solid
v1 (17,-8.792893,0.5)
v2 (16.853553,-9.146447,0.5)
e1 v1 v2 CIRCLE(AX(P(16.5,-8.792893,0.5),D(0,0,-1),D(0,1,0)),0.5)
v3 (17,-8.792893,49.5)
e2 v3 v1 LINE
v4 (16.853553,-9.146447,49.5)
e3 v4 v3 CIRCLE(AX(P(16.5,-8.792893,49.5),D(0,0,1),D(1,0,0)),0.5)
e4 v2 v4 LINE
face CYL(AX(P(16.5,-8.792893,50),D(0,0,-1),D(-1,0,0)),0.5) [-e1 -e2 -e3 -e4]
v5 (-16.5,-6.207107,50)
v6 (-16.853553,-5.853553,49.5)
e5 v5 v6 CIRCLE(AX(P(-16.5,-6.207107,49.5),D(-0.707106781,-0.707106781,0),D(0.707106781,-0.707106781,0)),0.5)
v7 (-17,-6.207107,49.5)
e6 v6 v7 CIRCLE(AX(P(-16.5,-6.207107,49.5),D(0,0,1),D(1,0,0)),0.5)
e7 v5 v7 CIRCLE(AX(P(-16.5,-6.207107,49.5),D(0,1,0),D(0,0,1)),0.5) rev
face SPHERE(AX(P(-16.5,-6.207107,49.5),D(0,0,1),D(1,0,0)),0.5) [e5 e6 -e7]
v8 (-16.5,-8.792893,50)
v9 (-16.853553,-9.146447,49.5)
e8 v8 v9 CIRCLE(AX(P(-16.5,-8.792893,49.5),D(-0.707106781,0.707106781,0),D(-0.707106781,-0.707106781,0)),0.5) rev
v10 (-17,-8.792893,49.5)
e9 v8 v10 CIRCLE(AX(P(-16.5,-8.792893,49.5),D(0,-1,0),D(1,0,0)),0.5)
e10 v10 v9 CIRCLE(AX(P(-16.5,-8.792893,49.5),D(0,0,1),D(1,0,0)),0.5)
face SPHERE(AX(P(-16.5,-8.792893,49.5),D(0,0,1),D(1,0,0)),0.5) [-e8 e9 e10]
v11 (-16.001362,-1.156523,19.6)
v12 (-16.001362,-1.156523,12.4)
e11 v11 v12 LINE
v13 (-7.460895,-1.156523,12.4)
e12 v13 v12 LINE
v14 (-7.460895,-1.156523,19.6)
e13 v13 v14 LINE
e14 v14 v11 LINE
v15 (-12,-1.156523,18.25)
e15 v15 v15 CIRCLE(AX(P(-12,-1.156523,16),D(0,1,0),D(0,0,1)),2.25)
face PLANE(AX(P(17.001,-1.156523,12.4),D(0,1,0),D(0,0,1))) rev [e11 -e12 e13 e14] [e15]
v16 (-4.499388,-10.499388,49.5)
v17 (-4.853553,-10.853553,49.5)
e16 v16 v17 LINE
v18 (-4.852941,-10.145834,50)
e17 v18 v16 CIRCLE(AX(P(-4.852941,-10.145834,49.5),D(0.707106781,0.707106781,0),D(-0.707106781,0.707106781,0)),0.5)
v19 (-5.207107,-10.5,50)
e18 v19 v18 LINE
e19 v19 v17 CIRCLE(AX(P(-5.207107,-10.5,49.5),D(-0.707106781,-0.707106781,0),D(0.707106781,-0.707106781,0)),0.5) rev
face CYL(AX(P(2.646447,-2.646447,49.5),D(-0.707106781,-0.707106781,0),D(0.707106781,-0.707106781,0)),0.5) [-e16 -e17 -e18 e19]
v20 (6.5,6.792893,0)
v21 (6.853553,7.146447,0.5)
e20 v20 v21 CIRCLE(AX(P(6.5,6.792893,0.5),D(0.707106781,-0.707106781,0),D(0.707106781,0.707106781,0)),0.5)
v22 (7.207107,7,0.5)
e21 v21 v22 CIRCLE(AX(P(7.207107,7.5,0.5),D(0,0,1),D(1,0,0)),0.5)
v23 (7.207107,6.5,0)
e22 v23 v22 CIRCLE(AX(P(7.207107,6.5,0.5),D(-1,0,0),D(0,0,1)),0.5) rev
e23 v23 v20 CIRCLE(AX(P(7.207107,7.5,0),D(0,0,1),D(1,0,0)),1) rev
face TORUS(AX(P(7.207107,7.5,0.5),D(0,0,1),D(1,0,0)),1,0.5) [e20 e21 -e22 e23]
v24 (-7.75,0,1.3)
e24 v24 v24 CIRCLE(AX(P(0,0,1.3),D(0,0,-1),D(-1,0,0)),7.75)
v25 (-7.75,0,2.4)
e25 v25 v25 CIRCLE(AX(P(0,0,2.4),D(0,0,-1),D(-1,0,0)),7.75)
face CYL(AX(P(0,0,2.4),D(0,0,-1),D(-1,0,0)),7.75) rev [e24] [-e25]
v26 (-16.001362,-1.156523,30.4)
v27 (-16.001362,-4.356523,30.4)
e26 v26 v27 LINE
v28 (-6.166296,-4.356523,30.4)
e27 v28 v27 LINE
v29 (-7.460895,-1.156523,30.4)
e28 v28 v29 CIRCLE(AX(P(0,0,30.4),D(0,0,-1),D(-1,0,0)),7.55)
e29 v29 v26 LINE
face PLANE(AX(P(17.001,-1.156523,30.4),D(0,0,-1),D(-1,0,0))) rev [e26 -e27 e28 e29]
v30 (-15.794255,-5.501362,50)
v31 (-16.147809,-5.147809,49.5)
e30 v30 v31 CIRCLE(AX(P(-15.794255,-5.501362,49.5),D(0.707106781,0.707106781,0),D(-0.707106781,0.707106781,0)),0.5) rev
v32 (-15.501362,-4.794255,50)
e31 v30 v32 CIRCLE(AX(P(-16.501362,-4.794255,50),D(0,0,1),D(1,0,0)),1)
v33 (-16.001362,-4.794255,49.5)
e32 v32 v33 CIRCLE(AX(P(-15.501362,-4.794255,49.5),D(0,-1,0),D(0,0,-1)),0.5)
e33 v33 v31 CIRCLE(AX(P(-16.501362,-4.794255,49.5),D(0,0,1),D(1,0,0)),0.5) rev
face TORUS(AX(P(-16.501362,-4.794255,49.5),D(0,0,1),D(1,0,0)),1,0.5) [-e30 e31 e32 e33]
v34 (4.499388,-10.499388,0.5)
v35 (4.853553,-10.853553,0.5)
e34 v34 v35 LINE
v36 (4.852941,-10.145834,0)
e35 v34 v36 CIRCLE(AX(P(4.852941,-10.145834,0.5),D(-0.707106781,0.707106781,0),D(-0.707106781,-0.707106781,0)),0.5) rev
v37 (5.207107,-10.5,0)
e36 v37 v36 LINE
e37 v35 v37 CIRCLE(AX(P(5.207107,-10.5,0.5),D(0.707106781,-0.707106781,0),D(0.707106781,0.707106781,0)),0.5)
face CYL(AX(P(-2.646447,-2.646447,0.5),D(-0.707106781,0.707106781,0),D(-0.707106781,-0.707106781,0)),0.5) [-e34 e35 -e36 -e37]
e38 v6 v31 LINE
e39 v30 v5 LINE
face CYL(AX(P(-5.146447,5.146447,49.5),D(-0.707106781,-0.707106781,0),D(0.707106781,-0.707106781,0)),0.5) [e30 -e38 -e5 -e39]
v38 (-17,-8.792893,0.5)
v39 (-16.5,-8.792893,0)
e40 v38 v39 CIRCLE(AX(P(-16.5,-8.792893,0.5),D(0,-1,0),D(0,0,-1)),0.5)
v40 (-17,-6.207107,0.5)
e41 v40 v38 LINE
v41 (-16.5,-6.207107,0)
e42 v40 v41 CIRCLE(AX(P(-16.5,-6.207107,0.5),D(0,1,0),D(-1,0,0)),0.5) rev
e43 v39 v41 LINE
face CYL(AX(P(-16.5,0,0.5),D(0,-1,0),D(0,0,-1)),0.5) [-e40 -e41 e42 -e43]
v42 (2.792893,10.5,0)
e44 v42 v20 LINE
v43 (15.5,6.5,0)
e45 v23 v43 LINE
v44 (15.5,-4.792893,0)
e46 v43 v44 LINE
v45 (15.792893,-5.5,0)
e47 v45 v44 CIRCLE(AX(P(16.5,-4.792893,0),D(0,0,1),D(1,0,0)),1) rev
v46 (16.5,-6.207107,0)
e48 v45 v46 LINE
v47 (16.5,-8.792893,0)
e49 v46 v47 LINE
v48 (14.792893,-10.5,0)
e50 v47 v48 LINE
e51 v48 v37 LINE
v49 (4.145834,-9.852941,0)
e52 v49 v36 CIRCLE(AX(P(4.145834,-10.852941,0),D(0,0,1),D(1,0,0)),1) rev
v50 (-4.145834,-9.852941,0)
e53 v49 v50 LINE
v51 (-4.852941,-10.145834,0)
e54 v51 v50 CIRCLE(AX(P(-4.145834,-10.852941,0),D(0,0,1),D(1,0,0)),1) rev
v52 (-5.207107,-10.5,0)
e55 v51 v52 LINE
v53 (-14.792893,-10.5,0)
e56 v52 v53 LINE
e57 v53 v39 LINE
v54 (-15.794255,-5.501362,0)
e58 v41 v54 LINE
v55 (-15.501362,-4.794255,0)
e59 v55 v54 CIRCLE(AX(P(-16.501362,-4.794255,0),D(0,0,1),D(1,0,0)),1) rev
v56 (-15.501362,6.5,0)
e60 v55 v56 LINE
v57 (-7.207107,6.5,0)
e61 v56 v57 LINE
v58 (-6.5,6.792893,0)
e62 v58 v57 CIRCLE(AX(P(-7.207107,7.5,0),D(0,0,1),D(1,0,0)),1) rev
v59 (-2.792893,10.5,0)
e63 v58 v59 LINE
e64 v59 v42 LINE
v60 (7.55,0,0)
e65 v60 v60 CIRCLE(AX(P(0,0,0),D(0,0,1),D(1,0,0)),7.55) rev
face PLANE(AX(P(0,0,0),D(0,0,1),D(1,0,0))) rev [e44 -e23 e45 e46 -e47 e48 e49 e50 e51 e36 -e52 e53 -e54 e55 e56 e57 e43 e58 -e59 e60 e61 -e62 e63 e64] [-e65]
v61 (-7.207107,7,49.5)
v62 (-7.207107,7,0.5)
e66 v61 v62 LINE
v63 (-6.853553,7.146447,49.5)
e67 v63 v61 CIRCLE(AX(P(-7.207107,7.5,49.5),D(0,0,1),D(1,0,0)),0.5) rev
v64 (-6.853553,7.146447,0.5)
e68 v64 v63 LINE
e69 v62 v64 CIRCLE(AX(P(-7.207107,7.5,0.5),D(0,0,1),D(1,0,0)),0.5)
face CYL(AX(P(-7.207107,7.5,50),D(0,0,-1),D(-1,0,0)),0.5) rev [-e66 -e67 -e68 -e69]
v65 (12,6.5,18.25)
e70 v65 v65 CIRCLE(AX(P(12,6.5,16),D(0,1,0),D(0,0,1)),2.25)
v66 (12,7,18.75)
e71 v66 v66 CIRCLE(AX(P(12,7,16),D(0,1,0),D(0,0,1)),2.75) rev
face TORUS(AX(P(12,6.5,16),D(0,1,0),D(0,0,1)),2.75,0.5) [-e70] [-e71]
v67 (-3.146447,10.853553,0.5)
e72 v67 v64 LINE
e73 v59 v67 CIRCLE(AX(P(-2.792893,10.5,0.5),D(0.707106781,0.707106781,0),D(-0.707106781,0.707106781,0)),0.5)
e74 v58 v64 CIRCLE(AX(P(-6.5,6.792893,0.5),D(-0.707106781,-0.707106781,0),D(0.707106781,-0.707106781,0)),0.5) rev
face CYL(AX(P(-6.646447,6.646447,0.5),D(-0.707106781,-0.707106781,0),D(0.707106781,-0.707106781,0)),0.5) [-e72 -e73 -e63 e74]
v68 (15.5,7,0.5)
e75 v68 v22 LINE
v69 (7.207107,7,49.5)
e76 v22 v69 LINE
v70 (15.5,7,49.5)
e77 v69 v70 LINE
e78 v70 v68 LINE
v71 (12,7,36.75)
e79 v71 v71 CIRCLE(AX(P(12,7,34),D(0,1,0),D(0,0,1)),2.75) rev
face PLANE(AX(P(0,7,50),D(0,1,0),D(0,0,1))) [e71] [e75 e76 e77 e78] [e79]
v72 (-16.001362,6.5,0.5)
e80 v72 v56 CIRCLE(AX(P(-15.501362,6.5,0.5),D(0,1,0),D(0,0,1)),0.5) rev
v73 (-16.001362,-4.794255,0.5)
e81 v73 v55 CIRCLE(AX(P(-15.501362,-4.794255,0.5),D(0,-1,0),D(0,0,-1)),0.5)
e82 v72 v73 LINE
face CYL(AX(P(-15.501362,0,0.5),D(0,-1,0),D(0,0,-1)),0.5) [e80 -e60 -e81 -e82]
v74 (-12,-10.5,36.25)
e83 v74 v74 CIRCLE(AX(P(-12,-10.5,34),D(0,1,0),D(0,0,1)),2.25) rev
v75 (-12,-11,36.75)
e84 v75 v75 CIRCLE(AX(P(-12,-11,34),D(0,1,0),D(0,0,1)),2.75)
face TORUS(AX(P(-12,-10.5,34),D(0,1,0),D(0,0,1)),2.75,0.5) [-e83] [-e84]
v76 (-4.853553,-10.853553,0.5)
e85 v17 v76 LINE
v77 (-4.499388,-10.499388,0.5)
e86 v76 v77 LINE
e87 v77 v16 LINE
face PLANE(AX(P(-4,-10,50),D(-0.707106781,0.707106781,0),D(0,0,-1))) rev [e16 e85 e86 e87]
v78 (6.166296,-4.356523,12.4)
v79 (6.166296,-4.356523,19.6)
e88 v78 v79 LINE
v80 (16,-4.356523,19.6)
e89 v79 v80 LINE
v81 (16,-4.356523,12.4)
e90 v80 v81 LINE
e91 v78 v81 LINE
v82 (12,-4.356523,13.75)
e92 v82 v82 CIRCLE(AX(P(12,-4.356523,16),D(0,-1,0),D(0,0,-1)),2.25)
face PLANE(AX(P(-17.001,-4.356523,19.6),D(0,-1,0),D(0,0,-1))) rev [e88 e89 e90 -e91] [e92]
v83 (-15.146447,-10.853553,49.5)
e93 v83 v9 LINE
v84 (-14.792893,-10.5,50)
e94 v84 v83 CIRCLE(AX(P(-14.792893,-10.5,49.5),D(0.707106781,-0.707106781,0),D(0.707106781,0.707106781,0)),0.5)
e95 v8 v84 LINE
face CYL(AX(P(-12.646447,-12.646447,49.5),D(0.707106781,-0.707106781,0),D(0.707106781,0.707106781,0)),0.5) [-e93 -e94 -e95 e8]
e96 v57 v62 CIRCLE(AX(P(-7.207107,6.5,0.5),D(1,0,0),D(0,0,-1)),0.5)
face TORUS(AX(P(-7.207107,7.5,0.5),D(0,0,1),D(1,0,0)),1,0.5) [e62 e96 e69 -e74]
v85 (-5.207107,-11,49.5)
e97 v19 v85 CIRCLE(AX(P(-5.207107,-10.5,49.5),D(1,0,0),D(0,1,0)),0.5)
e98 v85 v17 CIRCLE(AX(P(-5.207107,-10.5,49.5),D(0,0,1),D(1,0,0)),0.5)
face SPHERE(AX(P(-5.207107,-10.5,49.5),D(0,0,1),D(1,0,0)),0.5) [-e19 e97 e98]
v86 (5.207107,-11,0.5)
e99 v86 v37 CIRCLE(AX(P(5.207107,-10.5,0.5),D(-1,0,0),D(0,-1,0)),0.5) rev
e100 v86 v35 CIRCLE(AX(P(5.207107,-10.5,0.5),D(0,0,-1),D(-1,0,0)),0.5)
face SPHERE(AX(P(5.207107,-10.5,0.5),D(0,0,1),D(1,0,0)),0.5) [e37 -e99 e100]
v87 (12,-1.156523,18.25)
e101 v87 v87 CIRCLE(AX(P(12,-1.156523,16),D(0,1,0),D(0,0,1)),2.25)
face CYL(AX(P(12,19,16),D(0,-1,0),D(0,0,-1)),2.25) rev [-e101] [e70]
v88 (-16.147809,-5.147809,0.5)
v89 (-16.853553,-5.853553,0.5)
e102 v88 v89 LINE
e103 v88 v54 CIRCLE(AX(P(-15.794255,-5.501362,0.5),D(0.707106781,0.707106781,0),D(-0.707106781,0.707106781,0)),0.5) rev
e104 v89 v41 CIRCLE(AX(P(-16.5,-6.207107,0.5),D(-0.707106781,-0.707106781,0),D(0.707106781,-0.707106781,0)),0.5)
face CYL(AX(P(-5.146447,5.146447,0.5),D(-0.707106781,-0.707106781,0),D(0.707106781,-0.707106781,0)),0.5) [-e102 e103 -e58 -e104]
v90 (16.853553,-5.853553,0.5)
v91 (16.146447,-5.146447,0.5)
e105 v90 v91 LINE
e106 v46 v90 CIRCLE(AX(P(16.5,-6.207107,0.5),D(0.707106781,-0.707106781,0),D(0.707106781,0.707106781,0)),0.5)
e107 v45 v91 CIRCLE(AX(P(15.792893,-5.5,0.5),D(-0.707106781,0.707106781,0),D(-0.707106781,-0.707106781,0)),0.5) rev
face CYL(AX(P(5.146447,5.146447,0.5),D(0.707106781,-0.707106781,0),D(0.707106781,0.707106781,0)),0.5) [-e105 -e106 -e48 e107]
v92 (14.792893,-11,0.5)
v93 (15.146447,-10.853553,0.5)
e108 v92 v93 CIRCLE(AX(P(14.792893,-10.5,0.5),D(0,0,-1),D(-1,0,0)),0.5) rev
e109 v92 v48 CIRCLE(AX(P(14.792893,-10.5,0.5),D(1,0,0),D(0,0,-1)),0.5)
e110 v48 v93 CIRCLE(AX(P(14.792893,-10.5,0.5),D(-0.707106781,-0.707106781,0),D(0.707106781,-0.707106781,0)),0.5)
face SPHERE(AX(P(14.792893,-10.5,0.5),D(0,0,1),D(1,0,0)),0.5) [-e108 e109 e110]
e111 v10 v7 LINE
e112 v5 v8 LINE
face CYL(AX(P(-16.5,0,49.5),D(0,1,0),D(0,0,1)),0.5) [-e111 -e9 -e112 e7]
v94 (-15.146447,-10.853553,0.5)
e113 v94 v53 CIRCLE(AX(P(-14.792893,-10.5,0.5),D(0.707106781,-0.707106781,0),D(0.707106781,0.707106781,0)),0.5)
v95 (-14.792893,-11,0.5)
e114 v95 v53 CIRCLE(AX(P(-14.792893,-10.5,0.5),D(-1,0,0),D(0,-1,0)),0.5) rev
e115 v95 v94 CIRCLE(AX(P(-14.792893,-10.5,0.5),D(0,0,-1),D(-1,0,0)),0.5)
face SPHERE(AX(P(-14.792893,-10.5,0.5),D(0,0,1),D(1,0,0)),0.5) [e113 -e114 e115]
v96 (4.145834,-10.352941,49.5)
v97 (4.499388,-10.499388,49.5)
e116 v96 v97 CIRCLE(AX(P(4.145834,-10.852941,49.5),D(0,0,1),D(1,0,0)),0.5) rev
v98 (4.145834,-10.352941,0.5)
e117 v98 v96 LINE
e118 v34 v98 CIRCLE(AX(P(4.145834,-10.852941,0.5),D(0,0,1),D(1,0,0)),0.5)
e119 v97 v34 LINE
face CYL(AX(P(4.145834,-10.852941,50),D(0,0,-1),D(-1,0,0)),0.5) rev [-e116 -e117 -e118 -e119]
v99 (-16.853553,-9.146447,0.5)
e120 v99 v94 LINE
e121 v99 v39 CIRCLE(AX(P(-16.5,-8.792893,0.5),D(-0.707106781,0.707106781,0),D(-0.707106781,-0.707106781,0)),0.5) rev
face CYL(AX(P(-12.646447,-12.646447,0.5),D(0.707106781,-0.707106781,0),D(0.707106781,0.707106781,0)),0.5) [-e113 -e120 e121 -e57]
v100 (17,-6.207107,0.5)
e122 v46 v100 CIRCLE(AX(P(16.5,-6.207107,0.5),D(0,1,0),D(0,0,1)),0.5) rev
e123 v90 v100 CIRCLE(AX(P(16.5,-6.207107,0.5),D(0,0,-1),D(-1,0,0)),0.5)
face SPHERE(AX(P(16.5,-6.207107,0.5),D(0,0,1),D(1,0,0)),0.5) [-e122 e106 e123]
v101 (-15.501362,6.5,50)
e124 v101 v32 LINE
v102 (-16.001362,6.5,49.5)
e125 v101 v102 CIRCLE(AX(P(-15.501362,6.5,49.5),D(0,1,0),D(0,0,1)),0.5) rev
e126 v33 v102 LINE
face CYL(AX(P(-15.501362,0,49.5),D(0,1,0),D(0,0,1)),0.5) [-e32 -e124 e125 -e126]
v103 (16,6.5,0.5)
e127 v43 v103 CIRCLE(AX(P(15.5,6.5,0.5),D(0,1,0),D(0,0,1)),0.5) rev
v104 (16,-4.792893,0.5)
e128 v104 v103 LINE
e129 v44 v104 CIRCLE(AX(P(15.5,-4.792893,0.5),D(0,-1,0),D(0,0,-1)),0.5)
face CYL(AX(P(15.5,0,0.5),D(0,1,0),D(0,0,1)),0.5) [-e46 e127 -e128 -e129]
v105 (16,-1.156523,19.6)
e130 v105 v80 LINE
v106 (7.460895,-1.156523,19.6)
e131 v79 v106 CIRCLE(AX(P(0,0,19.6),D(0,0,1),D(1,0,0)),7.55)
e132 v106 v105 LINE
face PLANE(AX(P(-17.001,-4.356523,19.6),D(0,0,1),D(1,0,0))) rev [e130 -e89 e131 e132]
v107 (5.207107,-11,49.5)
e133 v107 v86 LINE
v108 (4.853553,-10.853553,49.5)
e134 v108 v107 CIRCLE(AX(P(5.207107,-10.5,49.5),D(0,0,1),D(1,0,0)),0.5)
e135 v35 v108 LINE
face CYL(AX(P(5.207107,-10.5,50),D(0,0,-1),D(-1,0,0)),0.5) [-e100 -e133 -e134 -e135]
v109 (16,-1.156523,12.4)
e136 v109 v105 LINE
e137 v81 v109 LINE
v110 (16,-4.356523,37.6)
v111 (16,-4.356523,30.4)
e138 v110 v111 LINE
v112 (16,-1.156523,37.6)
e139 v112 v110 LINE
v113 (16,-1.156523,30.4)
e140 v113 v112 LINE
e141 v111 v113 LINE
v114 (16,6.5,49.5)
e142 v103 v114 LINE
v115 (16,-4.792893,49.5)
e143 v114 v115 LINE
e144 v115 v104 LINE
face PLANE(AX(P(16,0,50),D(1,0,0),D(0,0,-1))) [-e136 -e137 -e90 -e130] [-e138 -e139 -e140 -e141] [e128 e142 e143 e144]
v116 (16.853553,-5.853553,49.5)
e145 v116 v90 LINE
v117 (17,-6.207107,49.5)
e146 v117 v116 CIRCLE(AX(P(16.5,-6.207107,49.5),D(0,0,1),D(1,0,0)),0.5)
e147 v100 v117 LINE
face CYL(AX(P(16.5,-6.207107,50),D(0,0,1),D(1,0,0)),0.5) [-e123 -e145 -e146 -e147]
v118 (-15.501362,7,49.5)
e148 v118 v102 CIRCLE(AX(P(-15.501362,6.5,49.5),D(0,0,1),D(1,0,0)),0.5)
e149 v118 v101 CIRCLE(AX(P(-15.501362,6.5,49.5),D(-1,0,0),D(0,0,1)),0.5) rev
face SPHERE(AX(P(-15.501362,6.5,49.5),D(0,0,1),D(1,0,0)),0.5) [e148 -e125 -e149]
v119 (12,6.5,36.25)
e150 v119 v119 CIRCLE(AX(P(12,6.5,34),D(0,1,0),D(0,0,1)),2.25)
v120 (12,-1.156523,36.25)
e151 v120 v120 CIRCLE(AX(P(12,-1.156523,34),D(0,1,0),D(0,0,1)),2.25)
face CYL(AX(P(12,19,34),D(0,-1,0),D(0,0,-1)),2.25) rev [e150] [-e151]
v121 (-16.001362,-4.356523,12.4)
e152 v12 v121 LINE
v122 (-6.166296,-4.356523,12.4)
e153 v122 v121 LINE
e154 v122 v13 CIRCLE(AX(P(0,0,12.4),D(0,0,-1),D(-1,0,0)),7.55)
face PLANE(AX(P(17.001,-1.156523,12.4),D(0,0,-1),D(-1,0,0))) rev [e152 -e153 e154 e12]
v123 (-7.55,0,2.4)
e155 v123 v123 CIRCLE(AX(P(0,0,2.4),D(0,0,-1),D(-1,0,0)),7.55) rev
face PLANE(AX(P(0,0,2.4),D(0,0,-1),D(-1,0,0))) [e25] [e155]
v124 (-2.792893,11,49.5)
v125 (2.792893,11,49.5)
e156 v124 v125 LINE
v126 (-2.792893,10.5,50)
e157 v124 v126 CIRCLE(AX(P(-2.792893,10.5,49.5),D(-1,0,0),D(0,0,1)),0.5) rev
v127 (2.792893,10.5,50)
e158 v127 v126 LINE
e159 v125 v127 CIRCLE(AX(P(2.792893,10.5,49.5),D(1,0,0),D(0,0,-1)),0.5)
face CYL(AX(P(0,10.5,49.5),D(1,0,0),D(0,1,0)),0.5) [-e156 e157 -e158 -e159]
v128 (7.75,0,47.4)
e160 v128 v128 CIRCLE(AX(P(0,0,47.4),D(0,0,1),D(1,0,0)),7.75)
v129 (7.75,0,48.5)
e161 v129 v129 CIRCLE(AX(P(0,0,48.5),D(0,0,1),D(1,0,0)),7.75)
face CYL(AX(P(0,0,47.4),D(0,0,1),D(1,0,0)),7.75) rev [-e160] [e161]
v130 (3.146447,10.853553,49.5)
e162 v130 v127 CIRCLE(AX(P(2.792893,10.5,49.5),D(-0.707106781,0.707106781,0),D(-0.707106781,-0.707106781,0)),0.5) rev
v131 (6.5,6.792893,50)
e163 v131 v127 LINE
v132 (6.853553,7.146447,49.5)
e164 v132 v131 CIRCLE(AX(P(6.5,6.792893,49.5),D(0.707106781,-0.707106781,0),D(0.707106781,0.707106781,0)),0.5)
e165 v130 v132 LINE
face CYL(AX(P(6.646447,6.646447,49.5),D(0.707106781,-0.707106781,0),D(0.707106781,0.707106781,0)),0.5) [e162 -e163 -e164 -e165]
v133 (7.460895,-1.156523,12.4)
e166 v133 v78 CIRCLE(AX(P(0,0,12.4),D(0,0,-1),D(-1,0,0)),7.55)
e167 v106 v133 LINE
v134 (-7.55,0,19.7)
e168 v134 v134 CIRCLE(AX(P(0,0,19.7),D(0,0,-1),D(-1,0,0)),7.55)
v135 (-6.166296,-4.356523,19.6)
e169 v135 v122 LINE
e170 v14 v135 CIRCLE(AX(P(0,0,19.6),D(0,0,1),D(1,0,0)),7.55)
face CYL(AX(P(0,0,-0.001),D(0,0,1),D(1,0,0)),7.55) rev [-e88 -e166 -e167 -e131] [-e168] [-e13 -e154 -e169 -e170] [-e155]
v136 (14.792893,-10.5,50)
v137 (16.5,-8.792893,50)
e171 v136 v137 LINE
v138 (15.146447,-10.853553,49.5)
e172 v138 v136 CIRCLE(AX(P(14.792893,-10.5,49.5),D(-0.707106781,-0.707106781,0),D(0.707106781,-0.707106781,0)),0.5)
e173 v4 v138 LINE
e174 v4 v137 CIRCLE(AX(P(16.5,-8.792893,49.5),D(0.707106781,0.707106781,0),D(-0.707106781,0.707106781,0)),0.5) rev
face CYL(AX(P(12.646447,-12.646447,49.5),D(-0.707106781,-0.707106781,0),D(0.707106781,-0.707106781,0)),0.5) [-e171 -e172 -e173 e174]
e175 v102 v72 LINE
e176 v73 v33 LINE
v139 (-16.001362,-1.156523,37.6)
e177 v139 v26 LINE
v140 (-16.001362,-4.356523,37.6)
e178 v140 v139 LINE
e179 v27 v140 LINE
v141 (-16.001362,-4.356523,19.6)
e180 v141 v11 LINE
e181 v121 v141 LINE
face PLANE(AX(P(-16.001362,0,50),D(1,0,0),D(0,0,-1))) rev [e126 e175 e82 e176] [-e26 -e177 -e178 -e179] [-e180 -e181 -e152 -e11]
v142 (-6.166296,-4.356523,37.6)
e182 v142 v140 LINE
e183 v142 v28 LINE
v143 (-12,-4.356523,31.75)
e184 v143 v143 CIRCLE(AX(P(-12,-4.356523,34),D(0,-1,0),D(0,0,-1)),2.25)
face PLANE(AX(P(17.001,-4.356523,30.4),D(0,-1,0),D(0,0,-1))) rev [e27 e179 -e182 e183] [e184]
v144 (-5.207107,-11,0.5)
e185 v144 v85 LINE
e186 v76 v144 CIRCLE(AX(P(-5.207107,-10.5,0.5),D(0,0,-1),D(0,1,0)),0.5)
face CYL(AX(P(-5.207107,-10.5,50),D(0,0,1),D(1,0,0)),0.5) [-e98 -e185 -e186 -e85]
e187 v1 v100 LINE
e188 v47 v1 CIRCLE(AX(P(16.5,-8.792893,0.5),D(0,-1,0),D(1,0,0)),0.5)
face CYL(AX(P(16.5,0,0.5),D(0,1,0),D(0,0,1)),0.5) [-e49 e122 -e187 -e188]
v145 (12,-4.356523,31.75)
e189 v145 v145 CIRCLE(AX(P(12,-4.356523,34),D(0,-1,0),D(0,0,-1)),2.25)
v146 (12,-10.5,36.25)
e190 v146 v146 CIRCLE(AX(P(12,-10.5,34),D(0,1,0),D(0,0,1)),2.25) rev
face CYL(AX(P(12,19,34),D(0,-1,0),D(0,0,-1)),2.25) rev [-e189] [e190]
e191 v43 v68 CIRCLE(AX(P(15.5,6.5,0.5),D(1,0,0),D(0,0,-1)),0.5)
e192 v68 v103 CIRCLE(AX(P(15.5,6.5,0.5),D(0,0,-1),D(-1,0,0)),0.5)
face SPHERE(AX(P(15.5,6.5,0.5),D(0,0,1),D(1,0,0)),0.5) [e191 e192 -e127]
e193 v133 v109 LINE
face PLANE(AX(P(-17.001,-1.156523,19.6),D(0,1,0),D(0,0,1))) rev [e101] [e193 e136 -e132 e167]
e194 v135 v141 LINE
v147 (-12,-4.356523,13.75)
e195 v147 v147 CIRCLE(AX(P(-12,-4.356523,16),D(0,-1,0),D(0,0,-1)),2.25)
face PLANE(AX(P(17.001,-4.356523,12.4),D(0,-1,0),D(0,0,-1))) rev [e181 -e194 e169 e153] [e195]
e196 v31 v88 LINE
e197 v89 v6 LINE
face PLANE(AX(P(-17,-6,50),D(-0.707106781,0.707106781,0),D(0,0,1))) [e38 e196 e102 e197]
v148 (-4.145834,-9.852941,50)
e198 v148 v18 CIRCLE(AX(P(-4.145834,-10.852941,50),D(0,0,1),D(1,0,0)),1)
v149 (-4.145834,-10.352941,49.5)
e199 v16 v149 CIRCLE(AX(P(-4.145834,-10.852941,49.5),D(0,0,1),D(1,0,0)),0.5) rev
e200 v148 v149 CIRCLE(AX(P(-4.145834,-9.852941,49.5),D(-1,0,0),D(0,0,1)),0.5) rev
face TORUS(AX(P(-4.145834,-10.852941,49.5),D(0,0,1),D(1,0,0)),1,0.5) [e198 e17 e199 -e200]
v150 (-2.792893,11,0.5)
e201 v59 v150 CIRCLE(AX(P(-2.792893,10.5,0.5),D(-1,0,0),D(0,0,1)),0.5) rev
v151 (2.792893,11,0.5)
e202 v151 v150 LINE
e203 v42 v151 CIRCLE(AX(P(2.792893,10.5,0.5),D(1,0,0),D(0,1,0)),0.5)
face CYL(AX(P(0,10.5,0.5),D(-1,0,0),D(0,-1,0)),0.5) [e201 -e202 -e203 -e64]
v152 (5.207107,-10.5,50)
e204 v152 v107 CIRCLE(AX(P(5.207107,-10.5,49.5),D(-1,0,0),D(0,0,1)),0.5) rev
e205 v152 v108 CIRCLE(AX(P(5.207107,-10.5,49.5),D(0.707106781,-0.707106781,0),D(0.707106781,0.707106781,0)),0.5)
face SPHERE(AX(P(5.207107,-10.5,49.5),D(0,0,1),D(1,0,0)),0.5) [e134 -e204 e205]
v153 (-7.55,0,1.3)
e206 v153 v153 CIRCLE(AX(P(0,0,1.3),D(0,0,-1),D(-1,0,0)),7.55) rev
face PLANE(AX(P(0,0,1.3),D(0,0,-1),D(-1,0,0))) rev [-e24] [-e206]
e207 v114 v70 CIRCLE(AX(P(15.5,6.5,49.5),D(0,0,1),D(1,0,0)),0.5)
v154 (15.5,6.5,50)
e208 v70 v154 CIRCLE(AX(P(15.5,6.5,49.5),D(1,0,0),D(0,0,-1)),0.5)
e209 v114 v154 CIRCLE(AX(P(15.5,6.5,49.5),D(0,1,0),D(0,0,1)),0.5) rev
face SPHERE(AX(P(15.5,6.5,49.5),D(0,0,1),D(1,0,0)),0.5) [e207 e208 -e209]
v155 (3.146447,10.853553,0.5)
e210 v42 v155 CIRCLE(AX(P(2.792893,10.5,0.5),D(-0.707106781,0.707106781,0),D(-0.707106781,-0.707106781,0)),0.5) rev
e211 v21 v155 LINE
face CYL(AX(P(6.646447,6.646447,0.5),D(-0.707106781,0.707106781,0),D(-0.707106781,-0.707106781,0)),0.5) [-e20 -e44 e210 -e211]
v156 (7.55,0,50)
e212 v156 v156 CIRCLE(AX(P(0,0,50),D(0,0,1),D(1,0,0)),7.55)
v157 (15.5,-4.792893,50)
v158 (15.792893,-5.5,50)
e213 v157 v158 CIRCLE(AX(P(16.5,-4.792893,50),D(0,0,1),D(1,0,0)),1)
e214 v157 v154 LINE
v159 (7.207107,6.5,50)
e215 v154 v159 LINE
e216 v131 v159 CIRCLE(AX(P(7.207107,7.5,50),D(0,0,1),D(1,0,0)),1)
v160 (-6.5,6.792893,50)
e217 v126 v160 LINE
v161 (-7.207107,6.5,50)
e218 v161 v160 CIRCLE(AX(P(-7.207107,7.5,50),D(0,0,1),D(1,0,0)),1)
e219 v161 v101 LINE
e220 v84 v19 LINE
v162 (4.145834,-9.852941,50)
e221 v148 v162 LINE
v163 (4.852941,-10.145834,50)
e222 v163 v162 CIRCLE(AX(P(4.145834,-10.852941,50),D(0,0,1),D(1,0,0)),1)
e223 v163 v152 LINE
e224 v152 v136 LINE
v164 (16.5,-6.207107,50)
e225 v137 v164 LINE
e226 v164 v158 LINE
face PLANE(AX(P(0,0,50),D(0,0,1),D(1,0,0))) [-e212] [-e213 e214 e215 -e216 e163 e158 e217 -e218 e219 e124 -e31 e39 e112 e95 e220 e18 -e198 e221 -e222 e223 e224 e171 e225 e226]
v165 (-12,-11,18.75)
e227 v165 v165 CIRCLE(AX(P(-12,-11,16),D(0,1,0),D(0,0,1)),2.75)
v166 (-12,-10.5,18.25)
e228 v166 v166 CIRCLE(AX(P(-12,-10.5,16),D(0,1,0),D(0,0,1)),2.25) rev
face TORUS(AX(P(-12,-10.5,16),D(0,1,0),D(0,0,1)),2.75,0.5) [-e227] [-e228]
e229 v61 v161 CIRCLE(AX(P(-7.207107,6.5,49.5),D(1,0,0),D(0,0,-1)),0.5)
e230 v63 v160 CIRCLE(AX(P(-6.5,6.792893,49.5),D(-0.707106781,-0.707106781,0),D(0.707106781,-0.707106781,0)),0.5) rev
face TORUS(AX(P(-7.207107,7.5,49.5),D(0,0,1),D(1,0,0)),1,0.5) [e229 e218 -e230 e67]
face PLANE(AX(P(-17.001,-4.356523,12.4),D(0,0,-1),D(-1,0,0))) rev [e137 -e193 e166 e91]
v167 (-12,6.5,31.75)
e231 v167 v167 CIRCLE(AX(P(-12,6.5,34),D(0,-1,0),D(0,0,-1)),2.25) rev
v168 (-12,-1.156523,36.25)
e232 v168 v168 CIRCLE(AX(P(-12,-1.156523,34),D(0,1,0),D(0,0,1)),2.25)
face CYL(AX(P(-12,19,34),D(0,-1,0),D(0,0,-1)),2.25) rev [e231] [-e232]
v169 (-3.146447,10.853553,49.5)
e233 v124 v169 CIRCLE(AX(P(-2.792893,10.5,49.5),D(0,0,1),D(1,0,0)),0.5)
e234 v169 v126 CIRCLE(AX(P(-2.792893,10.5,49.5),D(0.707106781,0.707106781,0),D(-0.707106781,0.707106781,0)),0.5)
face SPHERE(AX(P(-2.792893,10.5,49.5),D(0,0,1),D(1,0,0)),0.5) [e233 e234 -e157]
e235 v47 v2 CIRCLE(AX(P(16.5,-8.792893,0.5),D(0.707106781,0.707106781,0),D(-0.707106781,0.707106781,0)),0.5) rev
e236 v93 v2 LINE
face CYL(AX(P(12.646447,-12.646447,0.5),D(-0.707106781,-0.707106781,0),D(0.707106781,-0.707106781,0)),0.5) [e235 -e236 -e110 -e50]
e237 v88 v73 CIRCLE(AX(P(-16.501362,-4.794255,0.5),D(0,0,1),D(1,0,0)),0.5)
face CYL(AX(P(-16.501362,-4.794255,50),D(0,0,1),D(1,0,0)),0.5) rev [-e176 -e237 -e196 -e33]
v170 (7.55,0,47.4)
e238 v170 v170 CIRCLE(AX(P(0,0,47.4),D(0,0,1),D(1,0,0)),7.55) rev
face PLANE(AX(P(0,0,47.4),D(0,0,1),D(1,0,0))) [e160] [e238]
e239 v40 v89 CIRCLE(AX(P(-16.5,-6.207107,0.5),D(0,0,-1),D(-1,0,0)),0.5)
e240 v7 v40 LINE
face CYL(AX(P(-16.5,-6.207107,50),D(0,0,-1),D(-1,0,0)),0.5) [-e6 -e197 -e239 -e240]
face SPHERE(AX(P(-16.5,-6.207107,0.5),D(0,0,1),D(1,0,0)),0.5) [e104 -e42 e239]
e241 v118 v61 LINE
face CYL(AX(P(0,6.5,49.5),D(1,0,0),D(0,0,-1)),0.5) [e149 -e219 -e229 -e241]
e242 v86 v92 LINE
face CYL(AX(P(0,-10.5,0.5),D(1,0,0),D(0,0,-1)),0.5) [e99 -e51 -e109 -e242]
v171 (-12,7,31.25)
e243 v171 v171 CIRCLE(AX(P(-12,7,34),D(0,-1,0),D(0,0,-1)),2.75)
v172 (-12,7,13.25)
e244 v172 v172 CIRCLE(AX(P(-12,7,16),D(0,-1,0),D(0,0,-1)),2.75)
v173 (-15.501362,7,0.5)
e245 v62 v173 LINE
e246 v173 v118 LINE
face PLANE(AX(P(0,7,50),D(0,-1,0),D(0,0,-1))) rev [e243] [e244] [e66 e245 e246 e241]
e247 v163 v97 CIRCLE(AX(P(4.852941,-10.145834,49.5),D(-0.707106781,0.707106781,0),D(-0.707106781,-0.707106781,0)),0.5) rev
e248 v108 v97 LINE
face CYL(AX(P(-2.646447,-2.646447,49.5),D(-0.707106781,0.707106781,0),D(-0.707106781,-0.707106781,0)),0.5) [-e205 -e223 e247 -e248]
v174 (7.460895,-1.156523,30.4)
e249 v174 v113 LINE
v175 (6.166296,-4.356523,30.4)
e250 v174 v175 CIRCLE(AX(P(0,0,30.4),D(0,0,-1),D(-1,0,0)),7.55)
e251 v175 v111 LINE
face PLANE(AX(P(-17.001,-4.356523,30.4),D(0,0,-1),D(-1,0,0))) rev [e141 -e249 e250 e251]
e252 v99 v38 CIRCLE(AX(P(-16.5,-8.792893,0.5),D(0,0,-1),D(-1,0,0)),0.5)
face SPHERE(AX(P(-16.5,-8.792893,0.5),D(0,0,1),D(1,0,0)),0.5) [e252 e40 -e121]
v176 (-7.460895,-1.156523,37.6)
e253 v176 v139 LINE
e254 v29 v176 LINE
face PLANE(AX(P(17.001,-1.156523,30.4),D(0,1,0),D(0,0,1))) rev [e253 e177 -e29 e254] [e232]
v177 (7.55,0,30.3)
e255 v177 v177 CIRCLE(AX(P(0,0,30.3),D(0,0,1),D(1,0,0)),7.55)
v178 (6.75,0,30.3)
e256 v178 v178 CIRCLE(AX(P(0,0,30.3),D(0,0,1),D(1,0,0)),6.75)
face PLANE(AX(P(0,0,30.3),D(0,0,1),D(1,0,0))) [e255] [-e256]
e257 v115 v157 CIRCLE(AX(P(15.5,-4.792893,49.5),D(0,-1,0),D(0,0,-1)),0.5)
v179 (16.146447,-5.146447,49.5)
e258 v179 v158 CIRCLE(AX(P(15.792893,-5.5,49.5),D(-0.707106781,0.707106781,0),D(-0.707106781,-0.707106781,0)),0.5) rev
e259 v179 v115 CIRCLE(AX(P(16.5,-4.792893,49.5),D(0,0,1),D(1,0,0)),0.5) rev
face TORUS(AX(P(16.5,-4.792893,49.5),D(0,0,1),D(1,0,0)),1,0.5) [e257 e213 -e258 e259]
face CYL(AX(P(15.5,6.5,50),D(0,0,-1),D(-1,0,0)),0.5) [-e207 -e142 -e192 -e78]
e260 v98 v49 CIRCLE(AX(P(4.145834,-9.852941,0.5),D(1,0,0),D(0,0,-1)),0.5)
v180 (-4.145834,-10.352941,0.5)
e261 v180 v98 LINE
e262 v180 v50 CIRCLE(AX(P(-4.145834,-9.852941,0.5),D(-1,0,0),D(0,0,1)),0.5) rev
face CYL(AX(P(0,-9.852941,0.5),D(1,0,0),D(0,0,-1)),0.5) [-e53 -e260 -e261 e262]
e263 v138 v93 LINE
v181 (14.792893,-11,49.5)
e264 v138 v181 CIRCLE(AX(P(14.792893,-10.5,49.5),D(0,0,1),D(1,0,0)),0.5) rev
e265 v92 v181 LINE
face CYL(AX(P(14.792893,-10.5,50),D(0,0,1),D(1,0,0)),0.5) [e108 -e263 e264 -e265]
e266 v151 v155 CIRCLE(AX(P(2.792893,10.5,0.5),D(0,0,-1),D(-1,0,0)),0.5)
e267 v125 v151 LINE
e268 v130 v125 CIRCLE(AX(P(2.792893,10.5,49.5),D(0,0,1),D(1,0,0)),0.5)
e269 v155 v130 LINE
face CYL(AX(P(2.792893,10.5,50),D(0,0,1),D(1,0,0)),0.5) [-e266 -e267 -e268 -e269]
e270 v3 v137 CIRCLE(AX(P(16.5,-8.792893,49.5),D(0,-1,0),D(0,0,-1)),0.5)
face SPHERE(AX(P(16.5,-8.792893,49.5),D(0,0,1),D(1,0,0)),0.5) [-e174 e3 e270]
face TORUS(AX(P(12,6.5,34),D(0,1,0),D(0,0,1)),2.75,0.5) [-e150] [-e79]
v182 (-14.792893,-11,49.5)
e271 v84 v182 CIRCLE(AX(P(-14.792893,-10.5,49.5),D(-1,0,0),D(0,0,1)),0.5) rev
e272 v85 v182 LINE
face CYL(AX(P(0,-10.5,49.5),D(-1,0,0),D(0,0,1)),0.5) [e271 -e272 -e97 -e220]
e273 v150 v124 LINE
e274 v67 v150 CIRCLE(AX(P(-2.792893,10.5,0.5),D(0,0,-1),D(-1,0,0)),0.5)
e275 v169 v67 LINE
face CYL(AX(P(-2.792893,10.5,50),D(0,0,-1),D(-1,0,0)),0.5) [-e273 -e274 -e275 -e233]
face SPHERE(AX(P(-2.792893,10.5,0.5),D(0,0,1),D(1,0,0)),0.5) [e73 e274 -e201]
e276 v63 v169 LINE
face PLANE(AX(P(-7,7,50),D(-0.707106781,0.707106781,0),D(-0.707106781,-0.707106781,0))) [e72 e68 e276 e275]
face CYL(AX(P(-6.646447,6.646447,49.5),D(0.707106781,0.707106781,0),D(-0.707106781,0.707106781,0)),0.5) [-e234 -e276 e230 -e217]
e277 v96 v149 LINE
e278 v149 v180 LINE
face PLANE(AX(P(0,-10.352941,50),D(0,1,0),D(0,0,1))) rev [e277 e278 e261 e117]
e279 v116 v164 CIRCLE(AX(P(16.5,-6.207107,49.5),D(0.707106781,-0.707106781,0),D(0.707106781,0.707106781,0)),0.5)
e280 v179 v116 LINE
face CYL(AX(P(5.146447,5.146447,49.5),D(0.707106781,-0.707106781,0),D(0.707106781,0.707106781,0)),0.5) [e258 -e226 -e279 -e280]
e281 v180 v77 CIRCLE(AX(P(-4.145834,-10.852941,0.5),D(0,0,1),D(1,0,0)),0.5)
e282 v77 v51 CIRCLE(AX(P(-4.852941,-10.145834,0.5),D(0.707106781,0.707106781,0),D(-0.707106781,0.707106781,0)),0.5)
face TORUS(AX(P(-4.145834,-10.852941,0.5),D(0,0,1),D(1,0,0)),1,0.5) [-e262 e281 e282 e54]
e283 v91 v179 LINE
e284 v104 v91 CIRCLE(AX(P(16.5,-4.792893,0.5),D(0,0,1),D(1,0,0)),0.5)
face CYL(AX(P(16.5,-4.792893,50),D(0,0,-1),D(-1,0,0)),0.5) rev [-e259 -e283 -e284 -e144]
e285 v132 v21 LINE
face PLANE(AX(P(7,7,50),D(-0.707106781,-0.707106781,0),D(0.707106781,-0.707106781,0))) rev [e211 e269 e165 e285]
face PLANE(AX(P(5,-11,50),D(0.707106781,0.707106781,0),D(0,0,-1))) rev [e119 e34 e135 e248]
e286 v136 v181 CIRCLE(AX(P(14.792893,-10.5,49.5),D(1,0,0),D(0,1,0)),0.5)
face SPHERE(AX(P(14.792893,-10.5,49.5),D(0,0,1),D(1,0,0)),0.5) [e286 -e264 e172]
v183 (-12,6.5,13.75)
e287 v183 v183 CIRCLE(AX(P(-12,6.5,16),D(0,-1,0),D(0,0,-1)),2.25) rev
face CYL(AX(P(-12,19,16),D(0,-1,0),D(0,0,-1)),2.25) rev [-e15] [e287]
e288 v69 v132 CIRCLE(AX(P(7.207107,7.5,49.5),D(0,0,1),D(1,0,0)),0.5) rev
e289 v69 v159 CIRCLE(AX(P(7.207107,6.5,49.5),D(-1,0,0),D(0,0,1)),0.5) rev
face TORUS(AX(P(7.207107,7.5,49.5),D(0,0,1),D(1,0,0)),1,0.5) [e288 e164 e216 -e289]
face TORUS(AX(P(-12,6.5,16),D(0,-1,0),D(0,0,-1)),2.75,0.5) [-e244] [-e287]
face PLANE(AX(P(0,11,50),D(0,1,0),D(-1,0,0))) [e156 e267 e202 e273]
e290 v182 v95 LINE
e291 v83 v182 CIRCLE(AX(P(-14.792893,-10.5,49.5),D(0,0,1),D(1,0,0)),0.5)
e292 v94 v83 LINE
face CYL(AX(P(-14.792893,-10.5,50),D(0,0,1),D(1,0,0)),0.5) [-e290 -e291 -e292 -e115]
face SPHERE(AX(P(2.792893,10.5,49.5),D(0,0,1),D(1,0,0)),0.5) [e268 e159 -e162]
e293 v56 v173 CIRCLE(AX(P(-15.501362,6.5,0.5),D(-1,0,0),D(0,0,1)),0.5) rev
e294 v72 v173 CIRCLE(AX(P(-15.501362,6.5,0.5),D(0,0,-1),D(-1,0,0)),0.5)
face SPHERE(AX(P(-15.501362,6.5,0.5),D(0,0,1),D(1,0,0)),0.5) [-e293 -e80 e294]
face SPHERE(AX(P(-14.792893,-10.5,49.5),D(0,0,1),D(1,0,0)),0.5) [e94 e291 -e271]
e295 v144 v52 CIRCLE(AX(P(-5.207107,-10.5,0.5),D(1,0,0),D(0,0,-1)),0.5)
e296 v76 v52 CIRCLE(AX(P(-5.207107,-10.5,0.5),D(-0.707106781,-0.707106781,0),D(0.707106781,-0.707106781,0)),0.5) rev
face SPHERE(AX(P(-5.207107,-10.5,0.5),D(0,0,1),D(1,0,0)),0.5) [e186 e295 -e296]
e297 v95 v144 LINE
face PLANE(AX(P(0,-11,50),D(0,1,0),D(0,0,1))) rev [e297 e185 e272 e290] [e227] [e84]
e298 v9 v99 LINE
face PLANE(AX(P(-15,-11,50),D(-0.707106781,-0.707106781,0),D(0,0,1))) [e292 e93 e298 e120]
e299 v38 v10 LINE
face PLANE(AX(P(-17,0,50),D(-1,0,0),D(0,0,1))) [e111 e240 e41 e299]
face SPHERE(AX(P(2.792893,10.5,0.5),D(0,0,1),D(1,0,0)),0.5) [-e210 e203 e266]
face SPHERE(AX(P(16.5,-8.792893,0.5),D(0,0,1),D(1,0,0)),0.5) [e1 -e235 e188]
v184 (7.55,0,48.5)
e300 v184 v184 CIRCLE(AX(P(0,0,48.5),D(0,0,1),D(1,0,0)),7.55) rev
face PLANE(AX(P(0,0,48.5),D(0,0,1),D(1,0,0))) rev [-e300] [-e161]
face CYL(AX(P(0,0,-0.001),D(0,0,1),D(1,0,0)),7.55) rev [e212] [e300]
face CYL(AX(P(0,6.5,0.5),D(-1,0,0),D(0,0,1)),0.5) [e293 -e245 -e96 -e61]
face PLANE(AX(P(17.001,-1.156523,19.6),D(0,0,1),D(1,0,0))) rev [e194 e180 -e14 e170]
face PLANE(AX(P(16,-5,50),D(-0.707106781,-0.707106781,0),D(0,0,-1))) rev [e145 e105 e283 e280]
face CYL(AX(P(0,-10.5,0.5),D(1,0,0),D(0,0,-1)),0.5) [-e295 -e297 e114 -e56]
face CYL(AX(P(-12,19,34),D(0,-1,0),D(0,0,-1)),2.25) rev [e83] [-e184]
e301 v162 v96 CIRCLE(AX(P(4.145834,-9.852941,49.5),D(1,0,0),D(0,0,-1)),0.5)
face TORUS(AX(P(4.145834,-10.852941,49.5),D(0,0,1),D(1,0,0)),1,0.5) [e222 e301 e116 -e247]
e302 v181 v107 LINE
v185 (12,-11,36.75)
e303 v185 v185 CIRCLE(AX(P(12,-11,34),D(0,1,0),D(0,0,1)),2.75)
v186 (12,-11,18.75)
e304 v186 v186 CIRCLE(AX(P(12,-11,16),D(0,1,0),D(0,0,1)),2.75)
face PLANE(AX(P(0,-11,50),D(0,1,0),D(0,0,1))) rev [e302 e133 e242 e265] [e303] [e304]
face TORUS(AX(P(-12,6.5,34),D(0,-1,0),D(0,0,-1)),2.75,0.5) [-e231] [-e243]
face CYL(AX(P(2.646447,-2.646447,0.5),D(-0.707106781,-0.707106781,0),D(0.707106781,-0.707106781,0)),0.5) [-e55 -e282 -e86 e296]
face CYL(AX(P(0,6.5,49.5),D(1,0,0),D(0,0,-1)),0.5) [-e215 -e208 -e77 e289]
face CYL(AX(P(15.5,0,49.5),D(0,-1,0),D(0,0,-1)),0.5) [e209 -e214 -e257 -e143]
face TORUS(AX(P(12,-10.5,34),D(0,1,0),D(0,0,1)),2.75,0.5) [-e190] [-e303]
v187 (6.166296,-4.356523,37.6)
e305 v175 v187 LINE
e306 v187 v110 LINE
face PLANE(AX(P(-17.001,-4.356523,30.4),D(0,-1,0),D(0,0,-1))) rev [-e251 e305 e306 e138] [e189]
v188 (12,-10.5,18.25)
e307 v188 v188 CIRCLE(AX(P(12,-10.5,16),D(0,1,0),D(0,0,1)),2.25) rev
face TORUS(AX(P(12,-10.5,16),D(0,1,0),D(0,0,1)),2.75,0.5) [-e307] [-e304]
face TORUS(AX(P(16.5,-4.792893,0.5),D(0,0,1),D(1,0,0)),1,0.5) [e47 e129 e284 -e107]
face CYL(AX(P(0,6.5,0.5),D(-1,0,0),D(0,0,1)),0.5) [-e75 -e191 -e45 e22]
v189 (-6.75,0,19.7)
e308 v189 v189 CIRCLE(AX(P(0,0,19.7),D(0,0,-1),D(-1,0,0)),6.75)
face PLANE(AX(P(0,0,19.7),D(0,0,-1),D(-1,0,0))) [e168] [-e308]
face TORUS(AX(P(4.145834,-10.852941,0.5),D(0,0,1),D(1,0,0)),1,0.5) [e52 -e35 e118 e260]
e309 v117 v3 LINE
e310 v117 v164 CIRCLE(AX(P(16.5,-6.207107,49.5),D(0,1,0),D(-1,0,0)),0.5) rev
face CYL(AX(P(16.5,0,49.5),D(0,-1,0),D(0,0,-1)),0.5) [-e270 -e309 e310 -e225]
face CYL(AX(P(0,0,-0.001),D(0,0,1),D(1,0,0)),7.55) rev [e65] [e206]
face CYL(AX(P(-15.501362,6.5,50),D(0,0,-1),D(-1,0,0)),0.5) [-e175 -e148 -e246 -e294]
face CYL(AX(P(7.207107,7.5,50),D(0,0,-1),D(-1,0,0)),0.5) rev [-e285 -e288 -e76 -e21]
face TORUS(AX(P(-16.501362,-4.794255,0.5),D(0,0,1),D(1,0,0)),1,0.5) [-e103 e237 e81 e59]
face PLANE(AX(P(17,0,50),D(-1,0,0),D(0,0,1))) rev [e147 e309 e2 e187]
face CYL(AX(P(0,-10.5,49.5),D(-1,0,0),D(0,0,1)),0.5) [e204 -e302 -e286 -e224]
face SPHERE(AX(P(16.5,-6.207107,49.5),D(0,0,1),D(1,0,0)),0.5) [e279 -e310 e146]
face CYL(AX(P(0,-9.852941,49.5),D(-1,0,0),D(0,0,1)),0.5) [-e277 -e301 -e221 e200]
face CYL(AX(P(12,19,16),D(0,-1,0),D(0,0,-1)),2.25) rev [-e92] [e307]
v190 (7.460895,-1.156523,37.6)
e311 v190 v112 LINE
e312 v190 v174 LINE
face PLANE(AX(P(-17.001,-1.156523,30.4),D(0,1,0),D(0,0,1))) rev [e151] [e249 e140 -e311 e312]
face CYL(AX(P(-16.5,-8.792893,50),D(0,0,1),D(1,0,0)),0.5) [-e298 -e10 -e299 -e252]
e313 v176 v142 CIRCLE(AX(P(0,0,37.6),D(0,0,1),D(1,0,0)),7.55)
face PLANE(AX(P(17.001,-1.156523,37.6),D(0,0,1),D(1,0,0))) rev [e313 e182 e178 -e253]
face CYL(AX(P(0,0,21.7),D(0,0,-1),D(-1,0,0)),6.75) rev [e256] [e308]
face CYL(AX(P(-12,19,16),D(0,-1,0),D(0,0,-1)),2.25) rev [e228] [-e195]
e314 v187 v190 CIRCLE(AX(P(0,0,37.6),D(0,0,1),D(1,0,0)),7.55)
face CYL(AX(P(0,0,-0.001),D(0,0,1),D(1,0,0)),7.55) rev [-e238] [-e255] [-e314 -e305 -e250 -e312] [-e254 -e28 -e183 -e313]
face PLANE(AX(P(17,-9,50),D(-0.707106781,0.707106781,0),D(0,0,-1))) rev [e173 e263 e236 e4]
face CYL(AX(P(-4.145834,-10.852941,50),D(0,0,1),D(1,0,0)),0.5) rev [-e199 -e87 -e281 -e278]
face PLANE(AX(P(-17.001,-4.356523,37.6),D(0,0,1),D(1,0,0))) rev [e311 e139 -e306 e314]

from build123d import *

# Parameters (mm, degrees)
SKETCH1_R               = 4
BOSS_EXTRUDE1_DEPTH     = 50
CHAMFER1_SIZE           = 2
CHAMFER2_SIZE           = 1
FILLET1_R               = 0.5
SKETCH2_R               = 7
SKETCH2_R_2             = 3
CUT_EXTRUDE1_DEPTH      = 0.5
SKETCH4_R               = 2.25
CUT_EXTRUDE3_DEPTH      = 30
FILLET5_R               = 0.5
CUT_EXTRUDE4_REACH      = 55.944
SKETCH3_R               = 7.55
CUT_EXTRUDE5_START      = -1.3
SKETCH5_R               = 7.75
CUT_EXTRUDE5_DEPTH      = 1.1
CUT_EXTRUDE6_START      = -2.6
SKETCH6_R               = 7.75
CUT_EXTRUDE6_DEPTH      = 1.1
CUT_EXTRUDE7_REACH      = 62.91
CUT_EXTRUDE7_END_RADIUS = 7.55
SKETCH7_W               = 7.2
SKETCH7_H               = 3.2
CUT_EXTRUDE8_REACH      = 62.911
CUT_EXTRUDE8_END_RADIUS = 7.55
SKETCH8_W               = 7.2
SKETCH8_H               = 3.2
BOSS_EXTRUDE2_START     = -21.7
SKETCH9_R               = 7.55
SKETCH9_R_2             = 6.75
BOSS_EXTRUDE2_DEPTH     = 2
BOSS_EXTRUDE3_START     = -19.7
SKETCH10_R              = 7.55
SKETCH10_R_2            = 6.75
BOSS_EXTRUDE3_DEPTH     = 8.6


with BuildPart() as part:
    # Sketch1 → Boss-Extrude1 (new body)
    with BuildSketch(Plane.XY):
        Polygon((-17, -11), (-4, -11), (-4, -10.352941176), (4, -10.352941176), (4, -11), (17, -11), (17, -5), (16, -5), (16, 7), (7, 7), (3, 11), (-3, 11), (-7, 7), (-16.001361991, 7), (-16.001361991, -5), (-17, -5), align=None)
        Circle(SKETCH1_R, mode=Mode.SUBTRACT)
    extrude(amount=BOSS_EXTRUDE1_DEPTH)

    # Chamfer1
    chamfer1_edges = [part.edges().sort_by_distance(p)[0] for p in [
        (-17, -11, 25),
        (17, -11, 25),
    ]]
    chamfer(chamfer1_edges, length=CHAMFER1_SIZE)

    # Chamfer2
    # the kernel refuses this chamfer: 1 mm, written as the material it takes off along each edge
    with BuildSketch(Plane(origin=(17, -5, -2.571682988), x_dir=(0.027495876610585623, -0.9996219169112968, 0), z_dir=(0, 0, 1))) as chamfer2_piece_1_section:
        Polygon((CHAMFER2_SIZE * 0.999621916911, -CHAMFER2_SIZE * 0.0274958766106), (-CHAMFER2_SIZE * 0.0274958766106, -CHAMFER2_SIZE * 0.999621916911), (0, 0), align=None)
    chamfer2_piece_1 = extrude(amount=55.143365976, mode=Mode.PRIVATE)
    chamfer2_piece_1 = split(chamfer2_piece_1, bisect_by=Plane(origin=(16, -5.330404154, 25), z_dir=(1, 0, 0)), keep=Keep.TOP, mode=Mode.PRIVATE)
    add(chamfer2_piece_1, mode=Mode.SUBTRACT)
    with BuildSketch(Plane(origin=(-17, -5, -2.571682988), x_dir=(-0.027495876610585623, -0.9996219169112968, 0), z_dir=(0, 0, 1))) as chamfer2_piece_2_section:
        Polygon((CHAMFER2_SIZE * 0.999621916911, CHAMFER2_SIZE * 0.0274958766106), (-CHAMFER2_SIZE * 0.0274958766106, CHAMFER2_SIZE * 0.999621916911), (0, 0), align=None)
    chamfer2_piece_2 = extrude(amount=55.143365976, mode=Mode.PRIVATE)
    chamfer2_piece_2 = split(chamfer2_piece_2, bisect_by=Plane(origin=(-16.001361991, -5.330444965, 25), z_dir=(-1, 0, 0)), keep=Keep.TOP, mode=Mode.PRIVATE)
    add(chamfer2_piece_2, mode=Mode.SUBTRACT)
    with BuildSketch(Plane(origin=(-4, -11, -2.571682988), x_dir=(-0.9996219169112968, -0.027495876610585623, 0), z_dir=(0, 0, 1))) as chamfer2_piece_3_section:
        Polygon((CHAMFER2_SIZE * 0.999621916911, -CHAMFER2_SIZE * 0.0274958766106), (-CHAMFER2_SIZE * 0.0274958766106, -CHAMFER2_SIZE * 0.999621916911), (0, 0), align=None)
    chamfer2_piece_3 = extrude(amount=55.143365976, mode=Mode.PRIVATE)
    chamfer2_piece_3 = split(chamfer2_piece_3, bisect_by=Plane(origin=(-4.367144938, -10.352941176, 25), z_dir=(0, -1, 0)), keep=Keep.TOP, mode=Mode.PRIVATE)
    add(chamfer2_piece_3, mode=Mode.SUBTRACT)
    with BuildSketch(Plane(origin=(4, -11, -2.571682988), x_dir=(-0.02749587661058651, 0.9996219169112968, 0), z_dir=(0, 0, 1))) as chamfer2_piece_4_section:
        Polygon((CHAMFER2_SIZE * 0.999621916911, -CHAMFER2_SIZE * 0.0274958766106), (-CHAMFER2_SIZE * 0.0274958766106, -CHAMFER2_SIZE * 0.999621916911), (0, 0), align=None)
    chamfer2_piece_4 = extrude(amount=55.143365976, mode=Mode.PRIVATE)
    chamfer2_piece_4 = split(chamfer2_piece_4, bisect_by=Plane(origin=(4.367144938, -10.352941176, 25), z_dir=(0, -1, 0)), keep=Keep.TOP, mode=Mode.PRIVATE)
    add(chamfer2_piece_4, mode=Mode.SUBTRACT)

    # Fillet1
    fillet1_edges = [part.edges().sort_by_distance(p)[0] for p in [
        (-4, 0, 0),
        (16, 1, 50),
        (0, -10.352941176, 0),
        (-16.001361991, 0.999319005, 0),
        (-11.500680995, 7, 0),
        (11.5, 7, 50),
        (-5, 9, 0),
        (0, 11, 0),
        (5, 9, 0),
        (11.5, 7, 0),
        (16, 1, 0),
        (5, 9, 50),
        (0, 11, 50),
        (-16.001361991, 7, 25),
        (-7, 7, 25),
        (-3, 11, 25),
        (3, 11, 25),
        (7, 7, 25),
        (16, 7, 25),
        (16, -5, 25),
        (-5, 9, 50),
        (-11.500680995, 7, 50),
        (-16.001361991, 0.999319005, 50),
        (-10, -11, 0),
        (-10, -11, 50),
        (-15, -11, 25),
        (-17, -7.5, 0),
        (17, -7.5, 0),
        (16, -10, 0),
        (-16, -10, 0),
        (-17, -7.5, 50),
        (-17, -9, 25),
        (17, -7.5, 50),
        (16, -10, 50),
        (-16, -10, 50),
        (17, -9, 25),
        (15, -11, 25),
        (0, -10.352941176, 50),
        (10, -11, 0),
        (4.676470588, -10.676470588, 0),
        (-4.676470588, -10.676470588, 0),
        (-16.500680995, -5.500680995, 0),
        (16.5, -5.5, 0),
        (17, -6, 25),
        (10, -11, 50),
        (4.676470588, -10.676470588, 50),
        (-4.676470588, -10.676470588, 50),
        (-16.500680995, -5.500680995, 50),
        (-4, 0, 50),
        (16.5, -5.5, 50),
        (-17, -6, 25),
        (-5, -11, 25),
        (5, -11, 25),
        (-16.001361991, -5.001361991, 25),
        (-4.352941176, -10.352941176, 25),
        (4.352941176, -10.352941176, 25),
    ]]
    fillet(fillet1_edges, radius=FILLET1_R)

    # Sketch2 → Cut-Extrude1 (cut)
    with BuildSketch(Plane(origin=(0, 0, 0), x_dir=(-1, 0, 0), z_dir=(0, 0, -1))):
        Circle(SKETCH2_R)
        Circle(SKETCH2_R_2, mode=Mode.SUBTRACT)
    extrude(amount=-CUT_EXTRUDE1_DEPTH, mode=Mode.SUBTRACT)

    # Sketch4 → Cut-Extrude3 (cut)
    with BuildSketch(Plane.XZ.offset(11)):
        with Locations(Location((-12, 16, 0), (0, 0, 270))):
            Circle(SKETCH4_R)
        with Locations(Location((12, 16, 0), (0, 0, 270))):
            Circle(SKETCH4_R)
        with Locations(Location((12, 34, 0), (0, 0, 270))):
            Circle(SKETCH4_R)
        with Locations(Location((-12, 34, 0), (0, 0, 270))):
            Circle(SKETCH4_R)
    extrude(amount=-CUT_EXTRUDE3_DEPTH, mode=Mode.SUBTRACT)

    # Fillet5
    fillet5_edges = [part.edges().sort_by_distance(p)[0] for p in [
        (-12, 7, 36.25),
        (-12, -11, 36.25),
        (12, 7, 36.25),
        (12, -11, 36.25),
        (12, 7, 18.25),
        (12, -11, 18.25),
        (-12, 7, 18.25),
        (-12, -11, 18.25),
    ]]
    fillet(fillet5_edges, radius=FILLET5_R)

    # Sketch3 → Cut-Extrude4 (cut, up to next)
    with BuildSketch(Plane.XY.offset(50), mode=Mode.PRIVATE) as cut_extrude4_sk1:
        Circle(SKETCH3_R)
    cut_extrude4_tool1 = extrude(cut_extrude4_sk1.sketch, amount=-CUT_EXTRUDE4_REACH, mode=Mode.PRIVATE) & part.part
    add(cut_extrude4_tool1.solids().sort_by_distance((0, 0, 50))[0], mode=Mode.SUBTRACT)

    # Sketch5 → Cut-Extrude5 (cut)
    with BuildSketch(Plane(origin=(0, 0, 0), x_dir=(-1, 0, 0), z_dir=(0, 0, -1)).offset(CUT_EXTRUDE5_START)):
        Circle(SKETCH5_R)
    extrude(amount=-CUT_EXTRUDE5_DEPTH, mode=Mode.SUBTRACT)

    # Sketch6 → Cut-Extrude6 (cut)
    with BuildSketch(Plane.XY.offset(50).offset(CUT_EXTRUDE6_START)):
        with Locations(Location((0, 0, 0), (0, 0, 180))):
            Circle(SKETCH6_R)
    extrude(amount=CUT_EXTRUDE6_DEPTH, mode=Mode.SUBTRACT)

    # Cut-Extrude7: up to this cylinder (the profile starts outside it)
    cut_extrude7_end = Plane(origin=(0, 0, 25), z_dir=(0, 0, 1)) * Cylinder(CUT_EXTRUDE7_END_RADIUS, 159.92, mode=Mode.PRIVATE)
    # Sketch7 → Cut-Extrude7 (cut, up to the surface)
    with BuildSketch(Plane(origin=(16, 0, 0), x_dir=(0, 0, -1), z_dir=(1, 0, 0)), mode=Mode.PRIVATE) as cut_extrude7_sk1:
        with Locations((-16, -2.756523471)):
            Rectangle(SKETCH7_W, SKETCH7_H)
    cut_extrude7_tool1 = extrude(cut_extrude7_sk1.sketch, amount=-CUT_EXTRUDE7_REACH, mode=Mode.PRIVATE) - cut_extrude7_end
    add(cut_extrude7_tool1.solids().sort_by_distance((16, -2.756523, 16))[0], mode=Mode.SUBTRACT)
    # Sketch7 → Cut-Extrude7 (cut, up to the surface)
    with BuildSketch(Plane(origin=(16, 0, 0), x_dir=(0, 0, -1), z_dir=(1, 0, 0)), mode=Mode.PRIVATE) as cut_extrude7_sk2:
        with Locations((-34, -2.756523471)):
            Rectangle(SKETCH7_W, SKETCH7_H)
    cut_extrude7_tool2 = extrude(cut_extrude7_sk2.sketch, amount=-CUT_EXTRUDE7_REACH, mode=Mode.PRIVATE) - cut_extrude7_end
    add(cut_extrude7_tool2.solids().sort_by_distance((16, -2.756523, 34))[0], mode=Mode.SUBTRACT)

    # Cut-Extrude8: up to this cylinder (the profile starts outside it)
    cut_extrude8_end = Plane(origin=(0, 0, 25), z_dir=(0, 0, 1)) * Cylinder(CUT_EXTRUDE8_END_RADIUS, 159.922, mode=Mode.PRIVATE)
    # Sketch8 → Cut-Extrude8 (cut, up to the surface)
    with BuildSketch(Plane.ZY.offset(16.001361991), mode=Mode.PRIVATE) as cut_extrude8_sk1:
        with Locations((16, -2.756523471)):
            Rectangle(SKETCH8_W, SKETCH8_H)
    cut_extrude8_tool1 = extrude(cut_extrude8_sk1.sketch, amount=-CUT_EXTRUDE8_REACH, mode=Mode.PRIVATE) - cut_extrude8_end
    add(cut_extrude8_tool1.solids().sort_by_distance((-16.001362, -2.756523, 16))[0], mode=Mode.SUBTRACT)
    # Sketch8 → Cut-Extrude8 (cut, up to the surface)
    with BuildSketch(Plane.ZY.offset(16.001361991), mode=Mode.PRIVATE) as cut_extrude8_sk2:
        with Locations((34, -2.756523471)):
            Rectangle(SKETCH8_W, SKETCH8_H)
    cut_extrude8_tool2 = extrude(cut_extrude8_sk2.sketch, amount=-CUT_EXTRUDE8_REACH, mode=Mode.PRIVATE) - cut_extrude8_end
    add(cut_extrude8_tool2.solids().sort_by_distance((-16.001362, -2.756523, 34))[0], mode=Mode.SUBTRACT)

    # Sketch9 → Boss-Extrude2 (add)
    with BuildSketch(Plane(origin=(0, 0, 0), x_dir=(-1, 0, 0), z_dir=(0, 0, -1)).offset(BOSS_EXTRUDE2_START)):
        with Locations(Location((0, 0, 0), (0, 0, 180))):
            Circle(SKETCH9_R)
        Circle(SKETCH9_R_2, mode=Mode.SUBTRACT)
    extrude(amount=BOSS_EXTRUDE2_DEPTH)

    # Sketch10 → Boss-Extrude3 (add)
    with BuildSketch(Plane.XY.offset(50).offset(BOSS_EXTRUDE3_START)):
        Circle(SKETCH10_R)
        with Locations(Location((0, 0, 0), (0, 0, 180))):
            Circle(SKETCH10_R_2, mode=Mode.SUBTRACT)
    extrude(amount=-BOSS_EXTRUDE3_DEPTH)


solid = part.part
